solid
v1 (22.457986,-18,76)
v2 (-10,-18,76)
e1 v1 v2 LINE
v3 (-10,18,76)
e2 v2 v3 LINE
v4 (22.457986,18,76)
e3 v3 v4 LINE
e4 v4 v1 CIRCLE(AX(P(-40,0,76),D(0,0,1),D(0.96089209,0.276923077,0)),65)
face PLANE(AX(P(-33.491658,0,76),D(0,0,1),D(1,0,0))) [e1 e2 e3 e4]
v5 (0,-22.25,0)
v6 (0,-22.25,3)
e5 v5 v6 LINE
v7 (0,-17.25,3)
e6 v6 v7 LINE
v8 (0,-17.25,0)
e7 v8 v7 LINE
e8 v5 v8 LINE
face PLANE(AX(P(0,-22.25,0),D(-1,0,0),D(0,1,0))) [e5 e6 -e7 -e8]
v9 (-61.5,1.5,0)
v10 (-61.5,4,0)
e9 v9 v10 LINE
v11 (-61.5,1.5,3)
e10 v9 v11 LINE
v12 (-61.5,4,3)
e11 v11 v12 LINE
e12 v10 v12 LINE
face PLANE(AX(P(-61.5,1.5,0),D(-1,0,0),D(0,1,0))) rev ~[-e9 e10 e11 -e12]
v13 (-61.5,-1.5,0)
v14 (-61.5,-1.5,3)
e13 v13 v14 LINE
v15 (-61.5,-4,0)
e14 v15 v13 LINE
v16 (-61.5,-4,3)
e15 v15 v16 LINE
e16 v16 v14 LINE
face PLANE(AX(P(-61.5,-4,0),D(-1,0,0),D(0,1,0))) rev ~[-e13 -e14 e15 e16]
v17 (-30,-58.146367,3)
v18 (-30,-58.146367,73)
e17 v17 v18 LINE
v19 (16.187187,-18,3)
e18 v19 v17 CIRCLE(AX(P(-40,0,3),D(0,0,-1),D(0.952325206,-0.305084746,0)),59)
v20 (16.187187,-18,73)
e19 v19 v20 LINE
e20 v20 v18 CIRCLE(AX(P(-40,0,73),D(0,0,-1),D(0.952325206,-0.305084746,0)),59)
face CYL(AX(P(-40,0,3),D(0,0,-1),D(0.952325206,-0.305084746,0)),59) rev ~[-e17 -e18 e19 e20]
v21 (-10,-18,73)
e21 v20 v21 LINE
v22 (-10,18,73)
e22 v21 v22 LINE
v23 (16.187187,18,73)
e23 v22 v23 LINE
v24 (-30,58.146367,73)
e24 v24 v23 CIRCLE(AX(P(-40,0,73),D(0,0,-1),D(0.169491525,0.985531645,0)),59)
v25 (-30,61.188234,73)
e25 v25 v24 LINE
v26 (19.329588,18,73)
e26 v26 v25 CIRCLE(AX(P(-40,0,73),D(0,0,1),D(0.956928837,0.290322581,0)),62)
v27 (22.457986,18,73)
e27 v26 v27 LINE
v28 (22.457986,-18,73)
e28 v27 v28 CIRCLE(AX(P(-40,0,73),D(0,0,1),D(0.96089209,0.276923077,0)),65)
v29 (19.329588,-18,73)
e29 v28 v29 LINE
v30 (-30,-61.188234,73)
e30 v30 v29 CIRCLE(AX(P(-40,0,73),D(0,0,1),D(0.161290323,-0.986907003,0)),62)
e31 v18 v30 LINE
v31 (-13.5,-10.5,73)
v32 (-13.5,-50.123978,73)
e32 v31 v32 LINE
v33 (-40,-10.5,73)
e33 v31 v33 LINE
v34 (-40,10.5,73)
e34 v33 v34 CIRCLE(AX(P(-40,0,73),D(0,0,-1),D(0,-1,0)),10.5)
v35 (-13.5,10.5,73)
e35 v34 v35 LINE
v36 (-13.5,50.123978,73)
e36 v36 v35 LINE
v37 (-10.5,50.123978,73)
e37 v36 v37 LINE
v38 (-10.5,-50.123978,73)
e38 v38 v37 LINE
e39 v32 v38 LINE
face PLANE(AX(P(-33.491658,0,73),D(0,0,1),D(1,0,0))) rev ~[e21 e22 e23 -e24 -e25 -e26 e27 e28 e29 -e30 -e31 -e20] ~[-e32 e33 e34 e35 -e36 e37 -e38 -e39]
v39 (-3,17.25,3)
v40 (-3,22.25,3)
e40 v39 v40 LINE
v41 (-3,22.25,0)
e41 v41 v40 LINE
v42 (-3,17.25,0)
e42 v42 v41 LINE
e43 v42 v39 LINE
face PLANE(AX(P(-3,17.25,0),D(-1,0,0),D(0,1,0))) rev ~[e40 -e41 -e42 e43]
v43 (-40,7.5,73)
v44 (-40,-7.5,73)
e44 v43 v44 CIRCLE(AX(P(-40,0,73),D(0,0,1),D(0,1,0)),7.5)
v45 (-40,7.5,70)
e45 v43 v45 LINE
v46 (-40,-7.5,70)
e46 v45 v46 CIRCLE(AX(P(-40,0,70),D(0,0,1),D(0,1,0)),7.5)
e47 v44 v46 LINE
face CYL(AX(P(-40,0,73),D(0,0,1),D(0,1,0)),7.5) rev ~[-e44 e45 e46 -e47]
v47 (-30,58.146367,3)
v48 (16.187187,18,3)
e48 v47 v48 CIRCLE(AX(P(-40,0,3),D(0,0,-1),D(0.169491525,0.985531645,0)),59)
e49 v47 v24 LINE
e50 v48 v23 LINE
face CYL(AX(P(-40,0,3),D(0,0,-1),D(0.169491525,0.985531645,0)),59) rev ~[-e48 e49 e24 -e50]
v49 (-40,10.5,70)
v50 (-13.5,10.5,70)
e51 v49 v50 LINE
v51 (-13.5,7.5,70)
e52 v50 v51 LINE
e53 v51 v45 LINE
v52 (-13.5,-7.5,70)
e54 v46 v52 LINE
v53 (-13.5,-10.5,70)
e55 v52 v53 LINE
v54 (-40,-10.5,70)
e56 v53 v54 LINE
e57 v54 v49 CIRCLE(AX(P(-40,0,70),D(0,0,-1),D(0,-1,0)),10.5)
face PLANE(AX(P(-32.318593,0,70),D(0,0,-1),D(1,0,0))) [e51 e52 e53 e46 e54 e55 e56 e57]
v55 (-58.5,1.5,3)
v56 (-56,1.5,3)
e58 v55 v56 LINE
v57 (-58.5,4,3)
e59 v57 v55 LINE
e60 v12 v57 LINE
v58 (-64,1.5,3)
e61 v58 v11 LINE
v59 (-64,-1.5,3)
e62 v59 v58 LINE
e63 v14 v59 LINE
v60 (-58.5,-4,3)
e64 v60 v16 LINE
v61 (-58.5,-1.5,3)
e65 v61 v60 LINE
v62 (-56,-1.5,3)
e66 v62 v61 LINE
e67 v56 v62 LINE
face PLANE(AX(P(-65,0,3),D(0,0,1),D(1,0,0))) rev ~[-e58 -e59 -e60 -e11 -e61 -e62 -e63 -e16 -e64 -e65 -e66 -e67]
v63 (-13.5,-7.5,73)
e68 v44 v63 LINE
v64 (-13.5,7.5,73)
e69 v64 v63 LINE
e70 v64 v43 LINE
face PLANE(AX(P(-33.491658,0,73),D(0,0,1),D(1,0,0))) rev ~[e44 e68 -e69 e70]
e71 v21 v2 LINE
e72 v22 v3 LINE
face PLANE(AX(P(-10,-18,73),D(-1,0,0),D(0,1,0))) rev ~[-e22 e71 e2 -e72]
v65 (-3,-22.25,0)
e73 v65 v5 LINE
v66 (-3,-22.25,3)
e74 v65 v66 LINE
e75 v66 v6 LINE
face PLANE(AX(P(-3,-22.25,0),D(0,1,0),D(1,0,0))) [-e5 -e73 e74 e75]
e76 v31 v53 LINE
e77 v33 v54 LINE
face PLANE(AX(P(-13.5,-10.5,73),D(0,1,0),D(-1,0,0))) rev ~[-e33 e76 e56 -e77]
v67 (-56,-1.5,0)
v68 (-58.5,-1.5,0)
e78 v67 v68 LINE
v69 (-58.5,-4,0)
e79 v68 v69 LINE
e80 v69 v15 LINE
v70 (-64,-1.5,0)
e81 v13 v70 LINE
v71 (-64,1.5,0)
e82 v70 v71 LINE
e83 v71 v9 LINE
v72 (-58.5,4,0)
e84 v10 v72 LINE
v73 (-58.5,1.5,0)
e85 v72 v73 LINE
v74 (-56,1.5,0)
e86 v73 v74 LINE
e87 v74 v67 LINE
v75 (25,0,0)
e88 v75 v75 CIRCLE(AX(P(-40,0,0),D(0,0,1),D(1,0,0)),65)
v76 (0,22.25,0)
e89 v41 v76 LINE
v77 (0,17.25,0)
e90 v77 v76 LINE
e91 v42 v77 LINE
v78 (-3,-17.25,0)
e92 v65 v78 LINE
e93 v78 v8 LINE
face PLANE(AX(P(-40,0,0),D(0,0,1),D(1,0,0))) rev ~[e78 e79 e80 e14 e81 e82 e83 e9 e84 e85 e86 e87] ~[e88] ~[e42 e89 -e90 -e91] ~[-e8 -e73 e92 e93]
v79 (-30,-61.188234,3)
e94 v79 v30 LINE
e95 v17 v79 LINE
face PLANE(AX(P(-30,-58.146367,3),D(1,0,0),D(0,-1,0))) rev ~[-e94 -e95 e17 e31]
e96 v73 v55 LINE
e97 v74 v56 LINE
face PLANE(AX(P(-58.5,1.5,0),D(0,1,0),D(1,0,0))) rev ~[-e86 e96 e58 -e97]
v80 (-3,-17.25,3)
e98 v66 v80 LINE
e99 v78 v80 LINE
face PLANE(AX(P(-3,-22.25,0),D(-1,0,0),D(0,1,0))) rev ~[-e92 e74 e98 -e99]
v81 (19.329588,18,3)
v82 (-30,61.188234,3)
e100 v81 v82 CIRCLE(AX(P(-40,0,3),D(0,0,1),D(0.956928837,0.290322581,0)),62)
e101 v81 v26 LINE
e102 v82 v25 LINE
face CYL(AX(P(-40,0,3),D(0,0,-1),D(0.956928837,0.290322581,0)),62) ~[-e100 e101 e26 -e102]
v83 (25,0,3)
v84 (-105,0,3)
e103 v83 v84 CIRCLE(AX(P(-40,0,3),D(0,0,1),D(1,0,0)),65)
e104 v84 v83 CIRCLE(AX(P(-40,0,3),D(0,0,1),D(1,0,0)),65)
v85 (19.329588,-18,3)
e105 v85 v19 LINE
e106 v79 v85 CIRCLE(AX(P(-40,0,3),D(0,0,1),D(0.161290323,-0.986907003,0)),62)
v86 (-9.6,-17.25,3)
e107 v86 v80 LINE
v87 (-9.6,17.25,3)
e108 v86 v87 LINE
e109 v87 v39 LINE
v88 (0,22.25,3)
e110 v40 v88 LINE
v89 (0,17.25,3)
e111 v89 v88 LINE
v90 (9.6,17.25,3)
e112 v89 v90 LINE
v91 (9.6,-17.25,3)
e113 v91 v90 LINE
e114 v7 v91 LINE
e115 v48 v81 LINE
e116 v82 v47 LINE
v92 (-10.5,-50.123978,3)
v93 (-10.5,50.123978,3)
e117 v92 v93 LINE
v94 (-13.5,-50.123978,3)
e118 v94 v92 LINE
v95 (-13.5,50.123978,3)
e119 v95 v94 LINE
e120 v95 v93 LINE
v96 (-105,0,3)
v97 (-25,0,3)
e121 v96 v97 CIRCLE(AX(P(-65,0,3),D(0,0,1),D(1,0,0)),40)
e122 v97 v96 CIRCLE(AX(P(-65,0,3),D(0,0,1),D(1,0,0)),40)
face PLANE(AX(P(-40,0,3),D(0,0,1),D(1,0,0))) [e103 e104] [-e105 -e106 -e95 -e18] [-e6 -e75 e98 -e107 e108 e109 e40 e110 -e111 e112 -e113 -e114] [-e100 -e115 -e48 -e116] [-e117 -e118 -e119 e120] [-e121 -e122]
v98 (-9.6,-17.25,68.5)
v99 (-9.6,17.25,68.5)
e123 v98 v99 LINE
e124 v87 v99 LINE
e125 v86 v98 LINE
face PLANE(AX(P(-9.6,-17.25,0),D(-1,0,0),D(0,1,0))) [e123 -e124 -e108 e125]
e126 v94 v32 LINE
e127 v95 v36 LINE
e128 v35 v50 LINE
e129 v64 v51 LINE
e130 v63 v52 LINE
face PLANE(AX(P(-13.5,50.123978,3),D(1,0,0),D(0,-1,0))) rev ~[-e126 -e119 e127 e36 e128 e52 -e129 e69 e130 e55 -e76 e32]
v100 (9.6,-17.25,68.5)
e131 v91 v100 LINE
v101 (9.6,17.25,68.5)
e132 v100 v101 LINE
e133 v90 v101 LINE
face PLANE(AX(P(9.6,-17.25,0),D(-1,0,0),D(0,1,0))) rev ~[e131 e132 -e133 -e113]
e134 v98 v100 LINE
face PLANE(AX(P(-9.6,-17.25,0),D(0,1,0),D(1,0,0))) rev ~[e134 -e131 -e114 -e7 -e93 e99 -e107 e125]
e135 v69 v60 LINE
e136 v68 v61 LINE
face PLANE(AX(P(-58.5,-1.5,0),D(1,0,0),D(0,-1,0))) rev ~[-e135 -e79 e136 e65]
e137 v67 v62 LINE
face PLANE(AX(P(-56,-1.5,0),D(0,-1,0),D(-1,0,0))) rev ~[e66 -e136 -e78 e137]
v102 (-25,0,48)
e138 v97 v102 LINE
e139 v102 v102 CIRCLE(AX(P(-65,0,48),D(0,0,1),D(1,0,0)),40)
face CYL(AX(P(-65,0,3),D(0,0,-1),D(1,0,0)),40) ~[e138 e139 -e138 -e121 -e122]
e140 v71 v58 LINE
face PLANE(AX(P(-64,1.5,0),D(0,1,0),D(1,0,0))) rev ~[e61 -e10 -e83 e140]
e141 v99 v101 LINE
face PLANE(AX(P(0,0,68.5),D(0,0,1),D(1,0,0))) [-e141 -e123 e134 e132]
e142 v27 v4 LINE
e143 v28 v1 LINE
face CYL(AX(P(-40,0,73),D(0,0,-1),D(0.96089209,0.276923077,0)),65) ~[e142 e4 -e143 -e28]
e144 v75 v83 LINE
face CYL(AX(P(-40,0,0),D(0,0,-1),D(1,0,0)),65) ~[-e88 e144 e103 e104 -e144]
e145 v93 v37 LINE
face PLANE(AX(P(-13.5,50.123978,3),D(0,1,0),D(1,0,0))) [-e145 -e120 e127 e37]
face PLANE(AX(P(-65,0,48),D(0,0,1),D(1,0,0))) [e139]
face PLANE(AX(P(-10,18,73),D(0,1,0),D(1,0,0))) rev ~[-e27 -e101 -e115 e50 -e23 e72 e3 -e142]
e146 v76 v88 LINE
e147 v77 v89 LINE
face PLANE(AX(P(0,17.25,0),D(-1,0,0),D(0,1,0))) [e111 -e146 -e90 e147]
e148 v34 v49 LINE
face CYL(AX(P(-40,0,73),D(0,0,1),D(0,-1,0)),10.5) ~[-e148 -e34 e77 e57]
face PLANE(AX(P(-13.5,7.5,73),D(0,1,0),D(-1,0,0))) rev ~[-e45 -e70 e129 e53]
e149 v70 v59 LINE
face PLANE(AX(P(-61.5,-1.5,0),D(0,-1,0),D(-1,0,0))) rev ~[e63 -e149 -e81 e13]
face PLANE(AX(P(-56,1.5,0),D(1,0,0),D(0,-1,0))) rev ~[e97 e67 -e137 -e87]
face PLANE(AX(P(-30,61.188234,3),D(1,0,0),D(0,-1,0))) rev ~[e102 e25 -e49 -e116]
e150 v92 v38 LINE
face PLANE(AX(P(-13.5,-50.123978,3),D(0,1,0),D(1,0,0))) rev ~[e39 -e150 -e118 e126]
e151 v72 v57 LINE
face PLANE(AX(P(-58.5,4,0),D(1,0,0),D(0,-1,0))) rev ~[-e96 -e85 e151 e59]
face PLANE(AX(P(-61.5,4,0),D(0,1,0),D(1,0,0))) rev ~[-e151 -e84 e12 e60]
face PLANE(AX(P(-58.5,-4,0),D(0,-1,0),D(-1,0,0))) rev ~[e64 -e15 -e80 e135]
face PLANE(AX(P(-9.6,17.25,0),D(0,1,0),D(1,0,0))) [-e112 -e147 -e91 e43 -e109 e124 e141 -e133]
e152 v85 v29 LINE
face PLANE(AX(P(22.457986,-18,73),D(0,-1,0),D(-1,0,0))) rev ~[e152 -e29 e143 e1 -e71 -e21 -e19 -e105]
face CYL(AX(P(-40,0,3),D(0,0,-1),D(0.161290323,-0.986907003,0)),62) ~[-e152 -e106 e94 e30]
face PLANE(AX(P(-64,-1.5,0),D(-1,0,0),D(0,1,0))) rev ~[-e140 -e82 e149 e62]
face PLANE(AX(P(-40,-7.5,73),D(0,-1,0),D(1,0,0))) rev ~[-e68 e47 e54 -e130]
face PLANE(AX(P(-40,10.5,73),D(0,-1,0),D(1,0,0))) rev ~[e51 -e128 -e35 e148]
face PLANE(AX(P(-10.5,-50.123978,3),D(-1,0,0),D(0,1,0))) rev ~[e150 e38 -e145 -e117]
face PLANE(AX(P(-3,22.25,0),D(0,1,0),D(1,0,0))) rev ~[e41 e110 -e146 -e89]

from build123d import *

# Parameters (mm, degrees)
F0_W      = 19.2
F0_H      = 34.5
F1_DEPTH  = 68.5
F2_R      = 65
F2_W      = 3
F2_H      = 5
F3_DEPTH  = 3
F4_R      = 40
F5_DEPTH  = 45
F6_W      = 3
F6_H      = 36
F6_H_2    = 32.1239784062
F7_DEPTH  = 70
F11_DEPTH = 3
F13_DEPTH = 3


# Not quite as in the source:
# - a feature names something its author has since deleted; it is built from what else it names
# - the program builds the solid bodies; features that only make, move or delete a surface that nothing else refers to are left out


with BuildPart() as f1:
    # F0 (on Top) → F1 (new body)
    with BuildSketch(Plane.XY):
        Rectangle(F0_W, F0_H)
    extrude(amount=F1_DEPTH)

    # F2 (on Top) → F3 (join)
    with BuildSketch(Plane.XY):
        with Locations((-40, 0)):
            Circle(F2_R)
        with Locations((-13.5, -12.5)):
            Rectangle(F2_W, F2_H, mode=Mode.SUBTRACT)
        with Locations((-1.5, -19.75)):
            Rectangle(F2_W, F2_H, mode=Mode.SUBTRACT)
        Polygon((-58.5, -4), (-61.5, -4), (-61.5, -1.5), (-64, -1.5), (-64, 1.5), (-61.5, 1.5), (-61.5, 4), (-58.5, 4), (-58.5, 1.5), (-56, 1.5), (-56, -1.5), (-58.5, -1.5), align=None, mode=Mode.SUBTRACT)
        with Locations((-1.5, 19.75)):
            Rectangle(F2_W, F2_H, mode=Mode.SUBTRACT)
        with Locations((-13.5, -12.5)):
            Rectangle(F2_W, F2_H)
    extrude(amount=F3_DEPTH)

    # F4 (on face) → F5 (join)
    with BuildSketch(Plane.XY.offset(3)):
        with Locations((-65, 0)):
            Circle(F4_R)
    extrude(amount=F5_DEPTH)

    # F6 (on face) → F7 (join)
    with BuildSketch(Plane.XY.offset(3)):
        with Locations((-12, 0)):
            Rectangle(F6_W, F6_H)
        with Locations((-12, 34.0619892031)):
            Rectangle(F6_W, F6_H_2)
        with Locations((-12, -34.0619892031)):
            Rectangle(F6_W, F6_H_2)
        with BuildLine():
            Line((19.3295878968, -18), (16.1871871515, -18))
            ThreePointArc((16.1871871515, -18), (-1.2944625099, -44.5295561128), (-30, -58.1463670404))
            Line((-30, -58.1463670404), (-30, -61.1882341631))
            ThreePointArc((-30, -61.1882341631), (0.8405904954, -46.6481100151), (19.3295878968, -18))
        make_face()
        with BuildLine():
            Line((-30, 61.1882341631), (-30, 58.1463670404))
            ThreePointArc((-30, 58.1463670404), (-1.2944625099, 44.5295561128), (16.1871871515, 18))
            Line((16.1871871515, 18), (19.3295878968, 18))
            ThreePointArc((19.3295878968, 18), (0.8405904954, 46.6481100151), (-30, 61.1882341631))
        make_face()
    extrude(amount=F7_DEPTH)

    # F10 (on offset) → F11 (join)
    with BuildSketch(Plane.XY.offset(73)):
        with BuildLine():
            ThreePointArc((22.4579858785, 18), (-105, 0), (22.4579858785, -18))
            Line((22.4579858785, -18), (-10, -18))
            Line((-10, -18), (-10, 18))
            Line((-10, 18), (22.4579858785, 18))
        make_face()
    extrude(amount=F11_DEPTH)

    # F12 (on face) → F13 (join)
    with BuildSketch(Plane(origin=(0, 0, 73), x_dir=(1, 0, 0), z_dir=(0, 0, -1))):
        with BuildLine():
            Line((-13.5, -10.5), (-13.5, -7.5))
            Line((-13.5, -7.5), (-40, -7.5))
            ThreePointArc((-40, -7.5), (-47.5, 0), (-40, 7.5))
            Line((-40, 7.5), (-13.5, 7.5))
            Line((-13.5, 7.5), (-13.5, 10.5))
            Line((-13.5, 10.5), (-40, 10.5))
            ThreePointArc((-40, 10.5), (-50.5, 0), (-40, -10.5))
            Line((-40, -10.5), (-13.5, -10.5))
        make_face()
    extrude(amount=F13_DEPTH)


solid = f1.part
